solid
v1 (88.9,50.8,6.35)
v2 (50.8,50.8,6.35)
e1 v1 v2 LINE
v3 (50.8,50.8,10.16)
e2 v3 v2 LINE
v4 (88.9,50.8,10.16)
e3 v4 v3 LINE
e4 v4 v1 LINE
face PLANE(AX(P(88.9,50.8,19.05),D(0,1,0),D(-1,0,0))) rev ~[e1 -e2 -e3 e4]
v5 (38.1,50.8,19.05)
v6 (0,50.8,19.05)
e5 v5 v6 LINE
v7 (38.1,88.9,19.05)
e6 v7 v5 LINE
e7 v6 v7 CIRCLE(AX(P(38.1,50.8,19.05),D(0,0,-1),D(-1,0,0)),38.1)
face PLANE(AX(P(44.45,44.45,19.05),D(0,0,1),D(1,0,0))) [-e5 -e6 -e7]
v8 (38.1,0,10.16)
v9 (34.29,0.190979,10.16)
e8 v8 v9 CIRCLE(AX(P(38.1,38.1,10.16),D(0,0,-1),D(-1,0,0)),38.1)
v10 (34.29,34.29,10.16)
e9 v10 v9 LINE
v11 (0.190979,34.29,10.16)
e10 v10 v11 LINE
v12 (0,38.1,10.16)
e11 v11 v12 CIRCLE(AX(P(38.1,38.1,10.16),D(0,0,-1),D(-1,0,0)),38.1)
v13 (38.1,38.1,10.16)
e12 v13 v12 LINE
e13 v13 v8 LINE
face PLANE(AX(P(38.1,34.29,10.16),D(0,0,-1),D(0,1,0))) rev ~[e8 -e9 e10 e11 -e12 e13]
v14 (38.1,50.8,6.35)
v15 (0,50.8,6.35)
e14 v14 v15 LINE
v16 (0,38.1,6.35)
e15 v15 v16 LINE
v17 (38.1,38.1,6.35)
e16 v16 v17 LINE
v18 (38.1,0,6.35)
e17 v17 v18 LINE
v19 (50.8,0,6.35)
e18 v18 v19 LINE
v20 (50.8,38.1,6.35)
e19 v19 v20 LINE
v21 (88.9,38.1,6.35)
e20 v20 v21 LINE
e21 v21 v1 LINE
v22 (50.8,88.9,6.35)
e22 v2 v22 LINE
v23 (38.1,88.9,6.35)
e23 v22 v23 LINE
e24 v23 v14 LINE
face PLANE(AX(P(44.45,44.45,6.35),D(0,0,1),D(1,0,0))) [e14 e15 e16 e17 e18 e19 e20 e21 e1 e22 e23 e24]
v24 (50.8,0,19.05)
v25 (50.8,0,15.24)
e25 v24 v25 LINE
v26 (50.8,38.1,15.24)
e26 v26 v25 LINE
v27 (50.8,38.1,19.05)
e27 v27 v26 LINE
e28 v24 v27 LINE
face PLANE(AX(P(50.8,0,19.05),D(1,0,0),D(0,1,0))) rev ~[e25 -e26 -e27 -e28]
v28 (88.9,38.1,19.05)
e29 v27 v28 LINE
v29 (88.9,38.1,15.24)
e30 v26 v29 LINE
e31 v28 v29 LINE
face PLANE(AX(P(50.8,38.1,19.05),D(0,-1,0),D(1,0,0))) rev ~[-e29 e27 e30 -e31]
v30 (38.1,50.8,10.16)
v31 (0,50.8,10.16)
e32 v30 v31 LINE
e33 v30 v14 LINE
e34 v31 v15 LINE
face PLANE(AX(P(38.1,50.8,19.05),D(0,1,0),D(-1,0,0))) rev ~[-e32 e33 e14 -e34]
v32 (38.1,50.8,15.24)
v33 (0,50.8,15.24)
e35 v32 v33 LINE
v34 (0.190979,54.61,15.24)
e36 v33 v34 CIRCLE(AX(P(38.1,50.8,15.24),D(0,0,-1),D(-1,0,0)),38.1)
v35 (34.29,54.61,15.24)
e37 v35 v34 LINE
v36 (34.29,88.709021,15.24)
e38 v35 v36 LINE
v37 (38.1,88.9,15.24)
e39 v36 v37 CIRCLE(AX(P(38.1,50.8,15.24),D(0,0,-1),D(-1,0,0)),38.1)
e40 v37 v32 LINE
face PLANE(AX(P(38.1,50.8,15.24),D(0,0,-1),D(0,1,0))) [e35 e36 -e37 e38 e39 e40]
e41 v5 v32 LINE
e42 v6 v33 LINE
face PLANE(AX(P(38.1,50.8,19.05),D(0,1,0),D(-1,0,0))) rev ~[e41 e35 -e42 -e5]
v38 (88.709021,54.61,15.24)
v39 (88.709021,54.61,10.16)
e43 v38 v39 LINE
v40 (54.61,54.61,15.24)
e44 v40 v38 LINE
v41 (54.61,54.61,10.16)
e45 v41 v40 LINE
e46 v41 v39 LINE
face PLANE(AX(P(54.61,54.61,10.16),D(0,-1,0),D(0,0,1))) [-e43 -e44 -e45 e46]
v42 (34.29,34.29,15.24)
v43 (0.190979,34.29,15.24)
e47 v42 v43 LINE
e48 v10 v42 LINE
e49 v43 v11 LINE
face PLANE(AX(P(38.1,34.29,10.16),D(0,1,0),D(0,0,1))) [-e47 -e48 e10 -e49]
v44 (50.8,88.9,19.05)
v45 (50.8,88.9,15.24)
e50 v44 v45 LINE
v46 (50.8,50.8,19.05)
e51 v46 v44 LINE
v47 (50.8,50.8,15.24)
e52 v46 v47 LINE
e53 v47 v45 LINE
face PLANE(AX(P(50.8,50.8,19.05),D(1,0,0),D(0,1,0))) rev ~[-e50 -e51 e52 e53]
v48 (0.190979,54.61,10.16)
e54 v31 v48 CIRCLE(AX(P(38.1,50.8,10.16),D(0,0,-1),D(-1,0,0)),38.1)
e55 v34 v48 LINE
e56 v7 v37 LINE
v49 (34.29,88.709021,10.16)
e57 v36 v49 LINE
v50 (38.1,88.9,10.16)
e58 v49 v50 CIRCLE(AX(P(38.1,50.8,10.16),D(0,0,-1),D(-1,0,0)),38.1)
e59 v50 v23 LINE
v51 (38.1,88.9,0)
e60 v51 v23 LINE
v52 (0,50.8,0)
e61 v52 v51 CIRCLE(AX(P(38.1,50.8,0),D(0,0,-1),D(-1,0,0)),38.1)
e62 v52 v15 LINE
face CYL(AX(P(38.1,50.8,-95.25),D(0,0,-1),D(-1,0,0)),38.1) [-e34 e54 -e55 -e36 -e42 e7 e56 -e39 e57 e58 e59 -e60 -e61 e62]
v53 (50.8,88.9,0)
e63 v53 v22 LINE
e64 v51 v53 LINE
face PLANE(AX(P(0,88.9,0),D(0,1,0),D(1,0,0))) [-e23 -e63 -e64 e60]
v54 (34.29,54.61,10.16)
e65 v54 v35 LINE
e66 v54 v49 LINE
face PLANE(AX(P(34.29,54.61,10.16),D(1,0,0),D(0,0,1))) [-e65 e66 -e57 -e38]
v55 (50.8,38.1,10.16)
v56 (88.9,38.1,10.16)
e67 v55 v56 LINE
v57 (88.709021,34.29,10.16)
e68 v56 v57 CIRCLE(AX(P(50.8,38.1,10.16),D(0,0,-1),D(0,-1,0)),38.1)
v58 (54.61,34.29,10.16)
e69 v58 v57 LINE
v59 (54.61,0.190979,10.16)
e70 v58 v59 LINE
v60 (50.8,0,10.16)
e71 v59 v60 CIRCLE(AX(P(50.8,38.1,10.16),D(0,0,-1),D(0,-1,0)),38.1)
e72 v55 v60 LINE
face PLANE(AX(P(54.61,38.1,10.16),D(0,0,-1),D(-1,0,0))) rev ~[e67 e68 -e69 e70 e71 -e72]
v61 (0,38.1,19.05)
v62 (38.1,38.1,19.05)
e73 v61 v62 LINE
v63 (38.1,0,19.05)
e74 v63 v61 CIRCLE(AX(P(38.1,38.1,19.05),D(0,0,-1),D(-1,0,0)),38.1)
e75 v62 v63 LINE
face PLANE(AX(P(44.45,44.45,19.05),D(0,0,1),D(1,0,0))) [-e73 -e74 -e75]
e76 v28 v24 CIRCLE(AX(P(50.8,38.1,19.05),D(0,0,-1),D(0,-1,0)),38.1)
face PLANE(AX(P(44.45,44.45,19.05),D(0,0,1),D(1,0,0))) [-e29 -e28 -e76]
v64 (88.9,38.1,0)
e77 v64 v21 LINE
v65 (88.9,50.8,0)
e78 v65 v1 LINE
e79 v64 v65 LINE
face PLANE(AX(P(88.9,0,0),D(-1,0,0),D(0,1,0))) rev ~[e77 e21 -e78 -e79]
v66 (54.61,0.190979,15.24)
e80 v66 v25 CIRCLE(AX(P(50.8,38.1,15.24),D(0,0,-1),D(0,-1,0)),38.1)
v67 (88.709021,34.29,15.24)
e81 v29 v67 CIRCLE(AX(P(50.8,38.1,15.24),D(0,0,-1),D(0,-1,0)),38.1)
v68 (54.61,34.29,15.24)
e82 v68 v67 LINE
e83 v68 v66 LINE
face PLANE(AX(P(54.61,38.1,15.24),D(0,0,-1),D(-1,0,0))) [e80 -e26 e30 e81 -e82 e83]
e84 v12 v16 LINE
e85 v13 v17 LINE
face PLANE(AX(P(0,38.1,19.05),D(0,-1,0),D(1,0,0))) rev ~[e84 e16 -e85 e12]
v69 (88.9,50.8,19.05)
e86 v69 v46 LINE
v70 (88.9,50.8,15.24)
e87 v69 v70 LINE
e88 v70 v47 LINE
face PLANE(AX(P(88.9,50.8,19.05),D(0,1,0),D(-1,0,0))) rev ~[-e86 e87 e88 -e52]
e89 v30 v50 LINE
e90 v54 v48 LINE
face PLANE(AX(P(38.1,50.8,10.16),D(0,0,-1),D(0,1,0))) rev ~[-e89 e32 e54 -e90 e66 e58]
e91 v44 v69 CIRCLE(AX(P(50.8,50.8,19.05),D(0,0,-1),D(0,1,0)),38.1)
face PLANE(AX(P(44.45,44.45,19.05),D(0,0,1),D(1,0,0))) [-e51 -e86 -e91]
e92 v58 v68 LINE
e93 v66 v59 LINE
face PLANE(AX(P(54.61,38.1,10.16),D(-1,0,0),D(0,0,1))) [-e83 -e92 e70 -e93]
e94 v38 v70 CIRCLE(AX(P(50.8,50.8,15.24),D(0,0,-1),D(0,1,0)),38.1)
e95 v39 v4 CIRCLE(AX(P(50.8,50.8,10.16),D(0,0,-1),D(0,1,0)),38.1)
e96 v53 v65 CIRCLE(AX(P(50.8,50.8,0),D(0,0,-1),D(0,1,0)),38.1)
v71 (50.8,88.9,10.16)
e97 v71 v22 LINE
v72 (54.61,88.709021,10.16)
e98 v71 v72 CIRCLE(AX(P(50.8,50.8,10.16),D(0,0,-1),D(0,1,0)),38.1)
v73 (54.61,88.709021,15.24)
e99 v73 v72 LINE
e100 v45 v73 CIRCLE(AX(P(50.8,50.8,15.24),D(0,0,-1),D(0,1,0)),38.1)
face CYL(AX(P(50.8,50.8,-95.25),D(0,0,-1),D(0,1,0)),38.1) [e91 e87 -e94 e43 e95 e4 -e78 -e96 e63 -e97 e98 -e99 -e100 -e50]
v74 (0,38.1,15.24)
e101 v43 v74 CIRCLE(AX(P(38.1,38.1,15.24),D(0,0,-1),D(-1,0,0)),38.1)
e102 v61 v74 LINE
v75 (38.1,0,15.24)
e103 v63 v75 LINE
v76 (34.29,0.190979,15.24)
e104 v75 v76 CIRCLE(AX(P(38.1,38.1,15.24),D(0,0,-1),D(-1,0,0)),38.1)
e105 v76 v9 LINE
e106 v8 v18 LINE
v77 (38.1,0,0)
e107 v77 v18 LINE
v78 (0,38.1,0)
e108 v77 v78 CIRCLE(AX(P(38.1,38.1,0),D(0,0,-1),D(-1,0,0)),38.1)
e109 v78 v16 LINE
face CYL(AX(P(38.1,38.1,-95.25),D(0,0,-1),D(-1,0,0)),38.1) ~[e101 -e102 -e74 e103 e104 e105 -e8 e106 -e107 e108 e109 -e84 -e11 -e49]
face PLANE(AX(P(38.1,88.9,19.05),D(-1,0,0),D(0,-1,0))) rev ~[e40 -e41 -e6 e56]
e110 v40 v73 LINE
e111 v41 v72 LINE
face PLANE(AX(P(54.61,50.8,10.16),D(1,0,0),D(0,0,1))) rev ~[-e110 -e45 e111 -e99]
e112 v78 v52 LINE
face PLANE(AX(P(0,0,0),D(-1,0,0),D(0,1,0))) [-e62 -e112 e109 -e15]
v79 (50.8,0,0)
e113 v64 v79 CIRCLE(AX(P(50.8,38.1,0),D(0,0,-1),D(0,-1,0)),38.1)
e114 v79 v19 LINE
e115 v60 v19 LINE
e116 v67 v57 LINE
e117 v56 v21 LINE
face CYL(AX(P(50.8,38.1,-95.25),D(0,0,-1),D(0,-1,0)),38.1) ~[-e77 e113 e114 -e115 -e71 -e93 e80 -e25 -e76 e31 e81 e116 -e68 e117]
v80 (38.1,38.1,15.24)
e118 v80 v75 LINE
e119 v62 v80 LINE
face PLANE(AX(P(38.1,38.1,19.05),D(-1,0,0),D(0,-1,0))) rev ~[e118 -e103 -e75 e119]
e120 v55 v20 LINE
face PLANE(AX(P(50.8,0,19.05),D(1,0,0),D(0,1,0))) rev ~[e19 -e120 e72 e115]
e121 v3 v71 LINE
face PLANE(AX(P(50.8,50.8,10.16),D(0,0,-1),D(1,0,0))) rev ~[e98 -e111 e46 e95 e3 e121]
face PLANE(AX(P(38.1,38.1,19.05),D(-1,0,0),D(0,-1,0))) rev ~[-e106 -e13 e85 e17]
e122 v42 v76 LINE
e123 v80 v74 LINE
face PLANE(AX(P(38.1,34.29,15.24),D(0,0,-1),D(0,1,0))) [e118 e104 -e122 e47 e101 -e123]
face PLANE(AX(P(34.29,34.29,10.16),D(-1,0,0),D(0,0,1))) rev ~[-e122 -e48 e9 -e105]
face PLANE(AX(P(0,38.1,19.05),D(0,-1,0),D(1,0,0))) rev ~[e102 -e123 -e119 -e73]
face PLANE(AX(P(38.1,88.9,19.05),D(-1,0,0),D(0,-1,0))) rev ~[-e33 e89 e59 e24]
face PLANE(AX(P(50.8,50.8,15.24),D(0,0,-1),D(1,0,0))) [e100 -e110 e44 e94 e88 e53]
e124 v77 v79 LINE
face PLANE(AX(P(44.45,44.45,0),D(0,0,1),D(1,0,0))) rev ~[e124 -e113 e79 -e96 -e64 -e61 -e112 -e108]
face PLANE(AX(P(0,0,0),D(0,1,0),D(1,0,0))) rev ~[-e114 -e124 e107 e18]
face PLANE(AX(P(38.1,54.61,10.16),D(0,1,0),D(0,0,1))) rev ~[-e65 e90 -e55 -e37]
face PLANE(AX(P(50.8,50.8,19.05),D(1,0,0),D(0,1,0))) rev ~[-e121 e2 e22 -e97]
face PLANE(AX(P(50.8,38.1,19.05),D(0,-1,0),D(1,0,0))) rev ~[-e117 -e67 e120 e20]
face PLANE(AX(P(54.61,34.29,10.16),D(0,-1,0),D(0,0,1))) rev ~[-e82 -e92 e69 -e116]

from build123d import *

# Parameters (mm, degrees)
F0_W        = 88.9
F0_H        = 88.9
F1_DEPTH    = 19.05
F3_DEPTH    = 12.7
F4_T1_DEPTH = 209.55
F5_W        = 3.81
F5_H        = 5.08
F6_DEPTH    = 38.1
F7_W        = 3.81
F7_H        = 5.08
F8_DEPTH    = 38.1
F9_W        = 3.81
F9_H        = 5.08
F10_DEPTH   = 38.1
F11_W       = 3.81
F11_H       = 5.08
F12_DEPTH   = 38.1
F13_W       = 3.81
F13_H       = 5.08
F14_DEPTH   = 38.1
F15_W       = 3.81
F15_H       = 5.08
F16_DEPTH   = 38.1
F17_W       = 3.81
F17_H       = 5.08
F18_DEPTH   = 38.1
F19_W       = 3.81
F19_H       = 5.08
F20_DEPTH   = 38.1


# Not quite as in the source:
# - a fillet or chamfer that OpenCascade refuses, or shapes differently, is made with other operations: its cross-section is extruded or revolved along the edge and cut away or added


with BuildPart() as f1:
    # F0 (on Top) → F1 (new body)
    with BuildSketch(Plane.XY):
        with Locations((44.45, 44.45)):
            Rectangle(F0_W, F0_H)
    extrude(amount=F1_DEPTH)

    # F2 (on face) → F3 (cut)
    with BuildSketch(Plane.XY.offset(19.05)):
        Polygon((38.1, 50.8), (0, 50.8), (0, 38.1), (38.1, 38.1), (38.1, 0), (50.8, 0), (50.8, 38.1), (88.9, 38.1), (88.9, 50.8), (50.8, 50.8), (50.8, 88.9), (38.1, 88.9), align=None)
    extrude(amount=-F3_DEPTH, mode=Mode.SUBTRACT)

    # F4: fillet of radius 38.1 on 4 edges, made by hand

    # F4_s2 → F4_t1 (cut)
    with BuildSketch(Plane.XY.offset(-95.25)):
        with BuildLine():
            ThreePointArc((50.8, 0), (77.7407683632, 11.1592316368), (88.9, 38.1))
            Line((88.9, 38.1), (88.9, 0))
            Line((88.9, 0), (50.8, 0))
        make_face()
        with BuildLine():
            ThreePointArc((0, 38.1), (11.1592316368, 11.1592316368), (38.1, 0))
            Line((38.1, 0), (0, 0))
            Line((0, 0), (0, 38.1))
        make_face()
        with BuildLine():
            ThreePointArc((50.8, 88.9), (77.7407683632, 77.7407683632), (88.9, 50.8))
            Line((88.9, 50.8), (88.9, 88.9))
            Line((88.9, 88.9), (50.8, 88.9))
        make_face()
        with BuildLine():
            ThreePointArc((0, 50.8), (11.1592316368, 77.7407683632), (38.1, 88.9))
            Line((38.1, 88.9), (0, 88.9))
            Line((0, 88.9), (0, 50.8))
        make_face()
    extrude(amount=F4_T1_DEPTH, mode=Mode.SUBTRACT)

    # F5 (on face) → F6 (cut)
    with BuildSketch(Plane(origin=(0, 38.1, 0), x_dir=(-1, 0, 0), z_dir=(0, 1, 0))):
        with Locations((-52.705, 12.7)):
            Rectangle(F5_W, F5_H)
    extrude(amount=-F6_DEPTH, mode=Mode.SUBTRACT)

    # F7 (on face) → F8 (cut)
    with BuildSketch(Plane.XZ.offset(-50.8)):
        with Locations((52.705, 12.7)):
            Rectangle(F7_W, F7_H)
    extrude(amount=-F8_DEPTH, mode=Mode.SUBTRACT)

    # F9 (on face) → F10 (cut)
    with BuildSketch(Plane.YZ.offset(38.1)):
        with Locations((36.195, 12.7)):
            Rectangle(F9_W, F9_H)
    extrude(amount=-F10_DEPTH, mode=Mode.SUBTRACT)

    # F11 (on face) → F12 (cut)
    with BuildSketch(Plane(origin=(54.61, 0, 0), x_dir=(0, -1, 0), z_dir=(-1, 0, 0))):
        with Locations((-36.195, 12.7)):
            Rectangle(F11_W, F11_H)
    extrude(amount=-F12_DEPTH, mode=Mode.SUBTRACT)

    # F13 (on face) → F14 (cut)
    with BuildSketch(Plane.YZ.offset(38.1)):
        with Locations((52.705, 12.7)):
            Rectangle(F13_W, F13_H)
    extrude(amount=-F14_DEPTH, mode=Mode.SUBTRACT)

    # F15 (on face) → F16 (cut)
    with BuildSketch(Plane(origin=(54.61, 0, 0), x_dir=(0, -1, 0), z_dir=(-1, 0, 0))):
        with Locations((-52.705, 12.7)):
            Rectangle(F15_W, F15_H)
    extrude(amount=-F16_DEPTH, mode=Mode.SUBTRACT)

    # F17 (on face) → F18 (cut)
    with BuildSketch(Plane.XZ.offset(-54.61)):
        with Locations((36.195, 12.7)):
            Rectangle(F17_W, F17_H)
    extrude(amount=-F18_DEPTH, mode=Mode.SUBTRACT)

    # F19 (on face) → F20 (cut)
    with BuildSketch(Plane(origin=(0, 34.29, 0), x_dir=(-1, 0, 0), z_dir=(0, 1, 0))):
        with Locations((-36.195, 12.7)):
            Rectangle(F19_W, F19_H)
    extrude(amount=-F20_DEPTH, mode=Mode.SUBTRACT)


solid = f1.part
